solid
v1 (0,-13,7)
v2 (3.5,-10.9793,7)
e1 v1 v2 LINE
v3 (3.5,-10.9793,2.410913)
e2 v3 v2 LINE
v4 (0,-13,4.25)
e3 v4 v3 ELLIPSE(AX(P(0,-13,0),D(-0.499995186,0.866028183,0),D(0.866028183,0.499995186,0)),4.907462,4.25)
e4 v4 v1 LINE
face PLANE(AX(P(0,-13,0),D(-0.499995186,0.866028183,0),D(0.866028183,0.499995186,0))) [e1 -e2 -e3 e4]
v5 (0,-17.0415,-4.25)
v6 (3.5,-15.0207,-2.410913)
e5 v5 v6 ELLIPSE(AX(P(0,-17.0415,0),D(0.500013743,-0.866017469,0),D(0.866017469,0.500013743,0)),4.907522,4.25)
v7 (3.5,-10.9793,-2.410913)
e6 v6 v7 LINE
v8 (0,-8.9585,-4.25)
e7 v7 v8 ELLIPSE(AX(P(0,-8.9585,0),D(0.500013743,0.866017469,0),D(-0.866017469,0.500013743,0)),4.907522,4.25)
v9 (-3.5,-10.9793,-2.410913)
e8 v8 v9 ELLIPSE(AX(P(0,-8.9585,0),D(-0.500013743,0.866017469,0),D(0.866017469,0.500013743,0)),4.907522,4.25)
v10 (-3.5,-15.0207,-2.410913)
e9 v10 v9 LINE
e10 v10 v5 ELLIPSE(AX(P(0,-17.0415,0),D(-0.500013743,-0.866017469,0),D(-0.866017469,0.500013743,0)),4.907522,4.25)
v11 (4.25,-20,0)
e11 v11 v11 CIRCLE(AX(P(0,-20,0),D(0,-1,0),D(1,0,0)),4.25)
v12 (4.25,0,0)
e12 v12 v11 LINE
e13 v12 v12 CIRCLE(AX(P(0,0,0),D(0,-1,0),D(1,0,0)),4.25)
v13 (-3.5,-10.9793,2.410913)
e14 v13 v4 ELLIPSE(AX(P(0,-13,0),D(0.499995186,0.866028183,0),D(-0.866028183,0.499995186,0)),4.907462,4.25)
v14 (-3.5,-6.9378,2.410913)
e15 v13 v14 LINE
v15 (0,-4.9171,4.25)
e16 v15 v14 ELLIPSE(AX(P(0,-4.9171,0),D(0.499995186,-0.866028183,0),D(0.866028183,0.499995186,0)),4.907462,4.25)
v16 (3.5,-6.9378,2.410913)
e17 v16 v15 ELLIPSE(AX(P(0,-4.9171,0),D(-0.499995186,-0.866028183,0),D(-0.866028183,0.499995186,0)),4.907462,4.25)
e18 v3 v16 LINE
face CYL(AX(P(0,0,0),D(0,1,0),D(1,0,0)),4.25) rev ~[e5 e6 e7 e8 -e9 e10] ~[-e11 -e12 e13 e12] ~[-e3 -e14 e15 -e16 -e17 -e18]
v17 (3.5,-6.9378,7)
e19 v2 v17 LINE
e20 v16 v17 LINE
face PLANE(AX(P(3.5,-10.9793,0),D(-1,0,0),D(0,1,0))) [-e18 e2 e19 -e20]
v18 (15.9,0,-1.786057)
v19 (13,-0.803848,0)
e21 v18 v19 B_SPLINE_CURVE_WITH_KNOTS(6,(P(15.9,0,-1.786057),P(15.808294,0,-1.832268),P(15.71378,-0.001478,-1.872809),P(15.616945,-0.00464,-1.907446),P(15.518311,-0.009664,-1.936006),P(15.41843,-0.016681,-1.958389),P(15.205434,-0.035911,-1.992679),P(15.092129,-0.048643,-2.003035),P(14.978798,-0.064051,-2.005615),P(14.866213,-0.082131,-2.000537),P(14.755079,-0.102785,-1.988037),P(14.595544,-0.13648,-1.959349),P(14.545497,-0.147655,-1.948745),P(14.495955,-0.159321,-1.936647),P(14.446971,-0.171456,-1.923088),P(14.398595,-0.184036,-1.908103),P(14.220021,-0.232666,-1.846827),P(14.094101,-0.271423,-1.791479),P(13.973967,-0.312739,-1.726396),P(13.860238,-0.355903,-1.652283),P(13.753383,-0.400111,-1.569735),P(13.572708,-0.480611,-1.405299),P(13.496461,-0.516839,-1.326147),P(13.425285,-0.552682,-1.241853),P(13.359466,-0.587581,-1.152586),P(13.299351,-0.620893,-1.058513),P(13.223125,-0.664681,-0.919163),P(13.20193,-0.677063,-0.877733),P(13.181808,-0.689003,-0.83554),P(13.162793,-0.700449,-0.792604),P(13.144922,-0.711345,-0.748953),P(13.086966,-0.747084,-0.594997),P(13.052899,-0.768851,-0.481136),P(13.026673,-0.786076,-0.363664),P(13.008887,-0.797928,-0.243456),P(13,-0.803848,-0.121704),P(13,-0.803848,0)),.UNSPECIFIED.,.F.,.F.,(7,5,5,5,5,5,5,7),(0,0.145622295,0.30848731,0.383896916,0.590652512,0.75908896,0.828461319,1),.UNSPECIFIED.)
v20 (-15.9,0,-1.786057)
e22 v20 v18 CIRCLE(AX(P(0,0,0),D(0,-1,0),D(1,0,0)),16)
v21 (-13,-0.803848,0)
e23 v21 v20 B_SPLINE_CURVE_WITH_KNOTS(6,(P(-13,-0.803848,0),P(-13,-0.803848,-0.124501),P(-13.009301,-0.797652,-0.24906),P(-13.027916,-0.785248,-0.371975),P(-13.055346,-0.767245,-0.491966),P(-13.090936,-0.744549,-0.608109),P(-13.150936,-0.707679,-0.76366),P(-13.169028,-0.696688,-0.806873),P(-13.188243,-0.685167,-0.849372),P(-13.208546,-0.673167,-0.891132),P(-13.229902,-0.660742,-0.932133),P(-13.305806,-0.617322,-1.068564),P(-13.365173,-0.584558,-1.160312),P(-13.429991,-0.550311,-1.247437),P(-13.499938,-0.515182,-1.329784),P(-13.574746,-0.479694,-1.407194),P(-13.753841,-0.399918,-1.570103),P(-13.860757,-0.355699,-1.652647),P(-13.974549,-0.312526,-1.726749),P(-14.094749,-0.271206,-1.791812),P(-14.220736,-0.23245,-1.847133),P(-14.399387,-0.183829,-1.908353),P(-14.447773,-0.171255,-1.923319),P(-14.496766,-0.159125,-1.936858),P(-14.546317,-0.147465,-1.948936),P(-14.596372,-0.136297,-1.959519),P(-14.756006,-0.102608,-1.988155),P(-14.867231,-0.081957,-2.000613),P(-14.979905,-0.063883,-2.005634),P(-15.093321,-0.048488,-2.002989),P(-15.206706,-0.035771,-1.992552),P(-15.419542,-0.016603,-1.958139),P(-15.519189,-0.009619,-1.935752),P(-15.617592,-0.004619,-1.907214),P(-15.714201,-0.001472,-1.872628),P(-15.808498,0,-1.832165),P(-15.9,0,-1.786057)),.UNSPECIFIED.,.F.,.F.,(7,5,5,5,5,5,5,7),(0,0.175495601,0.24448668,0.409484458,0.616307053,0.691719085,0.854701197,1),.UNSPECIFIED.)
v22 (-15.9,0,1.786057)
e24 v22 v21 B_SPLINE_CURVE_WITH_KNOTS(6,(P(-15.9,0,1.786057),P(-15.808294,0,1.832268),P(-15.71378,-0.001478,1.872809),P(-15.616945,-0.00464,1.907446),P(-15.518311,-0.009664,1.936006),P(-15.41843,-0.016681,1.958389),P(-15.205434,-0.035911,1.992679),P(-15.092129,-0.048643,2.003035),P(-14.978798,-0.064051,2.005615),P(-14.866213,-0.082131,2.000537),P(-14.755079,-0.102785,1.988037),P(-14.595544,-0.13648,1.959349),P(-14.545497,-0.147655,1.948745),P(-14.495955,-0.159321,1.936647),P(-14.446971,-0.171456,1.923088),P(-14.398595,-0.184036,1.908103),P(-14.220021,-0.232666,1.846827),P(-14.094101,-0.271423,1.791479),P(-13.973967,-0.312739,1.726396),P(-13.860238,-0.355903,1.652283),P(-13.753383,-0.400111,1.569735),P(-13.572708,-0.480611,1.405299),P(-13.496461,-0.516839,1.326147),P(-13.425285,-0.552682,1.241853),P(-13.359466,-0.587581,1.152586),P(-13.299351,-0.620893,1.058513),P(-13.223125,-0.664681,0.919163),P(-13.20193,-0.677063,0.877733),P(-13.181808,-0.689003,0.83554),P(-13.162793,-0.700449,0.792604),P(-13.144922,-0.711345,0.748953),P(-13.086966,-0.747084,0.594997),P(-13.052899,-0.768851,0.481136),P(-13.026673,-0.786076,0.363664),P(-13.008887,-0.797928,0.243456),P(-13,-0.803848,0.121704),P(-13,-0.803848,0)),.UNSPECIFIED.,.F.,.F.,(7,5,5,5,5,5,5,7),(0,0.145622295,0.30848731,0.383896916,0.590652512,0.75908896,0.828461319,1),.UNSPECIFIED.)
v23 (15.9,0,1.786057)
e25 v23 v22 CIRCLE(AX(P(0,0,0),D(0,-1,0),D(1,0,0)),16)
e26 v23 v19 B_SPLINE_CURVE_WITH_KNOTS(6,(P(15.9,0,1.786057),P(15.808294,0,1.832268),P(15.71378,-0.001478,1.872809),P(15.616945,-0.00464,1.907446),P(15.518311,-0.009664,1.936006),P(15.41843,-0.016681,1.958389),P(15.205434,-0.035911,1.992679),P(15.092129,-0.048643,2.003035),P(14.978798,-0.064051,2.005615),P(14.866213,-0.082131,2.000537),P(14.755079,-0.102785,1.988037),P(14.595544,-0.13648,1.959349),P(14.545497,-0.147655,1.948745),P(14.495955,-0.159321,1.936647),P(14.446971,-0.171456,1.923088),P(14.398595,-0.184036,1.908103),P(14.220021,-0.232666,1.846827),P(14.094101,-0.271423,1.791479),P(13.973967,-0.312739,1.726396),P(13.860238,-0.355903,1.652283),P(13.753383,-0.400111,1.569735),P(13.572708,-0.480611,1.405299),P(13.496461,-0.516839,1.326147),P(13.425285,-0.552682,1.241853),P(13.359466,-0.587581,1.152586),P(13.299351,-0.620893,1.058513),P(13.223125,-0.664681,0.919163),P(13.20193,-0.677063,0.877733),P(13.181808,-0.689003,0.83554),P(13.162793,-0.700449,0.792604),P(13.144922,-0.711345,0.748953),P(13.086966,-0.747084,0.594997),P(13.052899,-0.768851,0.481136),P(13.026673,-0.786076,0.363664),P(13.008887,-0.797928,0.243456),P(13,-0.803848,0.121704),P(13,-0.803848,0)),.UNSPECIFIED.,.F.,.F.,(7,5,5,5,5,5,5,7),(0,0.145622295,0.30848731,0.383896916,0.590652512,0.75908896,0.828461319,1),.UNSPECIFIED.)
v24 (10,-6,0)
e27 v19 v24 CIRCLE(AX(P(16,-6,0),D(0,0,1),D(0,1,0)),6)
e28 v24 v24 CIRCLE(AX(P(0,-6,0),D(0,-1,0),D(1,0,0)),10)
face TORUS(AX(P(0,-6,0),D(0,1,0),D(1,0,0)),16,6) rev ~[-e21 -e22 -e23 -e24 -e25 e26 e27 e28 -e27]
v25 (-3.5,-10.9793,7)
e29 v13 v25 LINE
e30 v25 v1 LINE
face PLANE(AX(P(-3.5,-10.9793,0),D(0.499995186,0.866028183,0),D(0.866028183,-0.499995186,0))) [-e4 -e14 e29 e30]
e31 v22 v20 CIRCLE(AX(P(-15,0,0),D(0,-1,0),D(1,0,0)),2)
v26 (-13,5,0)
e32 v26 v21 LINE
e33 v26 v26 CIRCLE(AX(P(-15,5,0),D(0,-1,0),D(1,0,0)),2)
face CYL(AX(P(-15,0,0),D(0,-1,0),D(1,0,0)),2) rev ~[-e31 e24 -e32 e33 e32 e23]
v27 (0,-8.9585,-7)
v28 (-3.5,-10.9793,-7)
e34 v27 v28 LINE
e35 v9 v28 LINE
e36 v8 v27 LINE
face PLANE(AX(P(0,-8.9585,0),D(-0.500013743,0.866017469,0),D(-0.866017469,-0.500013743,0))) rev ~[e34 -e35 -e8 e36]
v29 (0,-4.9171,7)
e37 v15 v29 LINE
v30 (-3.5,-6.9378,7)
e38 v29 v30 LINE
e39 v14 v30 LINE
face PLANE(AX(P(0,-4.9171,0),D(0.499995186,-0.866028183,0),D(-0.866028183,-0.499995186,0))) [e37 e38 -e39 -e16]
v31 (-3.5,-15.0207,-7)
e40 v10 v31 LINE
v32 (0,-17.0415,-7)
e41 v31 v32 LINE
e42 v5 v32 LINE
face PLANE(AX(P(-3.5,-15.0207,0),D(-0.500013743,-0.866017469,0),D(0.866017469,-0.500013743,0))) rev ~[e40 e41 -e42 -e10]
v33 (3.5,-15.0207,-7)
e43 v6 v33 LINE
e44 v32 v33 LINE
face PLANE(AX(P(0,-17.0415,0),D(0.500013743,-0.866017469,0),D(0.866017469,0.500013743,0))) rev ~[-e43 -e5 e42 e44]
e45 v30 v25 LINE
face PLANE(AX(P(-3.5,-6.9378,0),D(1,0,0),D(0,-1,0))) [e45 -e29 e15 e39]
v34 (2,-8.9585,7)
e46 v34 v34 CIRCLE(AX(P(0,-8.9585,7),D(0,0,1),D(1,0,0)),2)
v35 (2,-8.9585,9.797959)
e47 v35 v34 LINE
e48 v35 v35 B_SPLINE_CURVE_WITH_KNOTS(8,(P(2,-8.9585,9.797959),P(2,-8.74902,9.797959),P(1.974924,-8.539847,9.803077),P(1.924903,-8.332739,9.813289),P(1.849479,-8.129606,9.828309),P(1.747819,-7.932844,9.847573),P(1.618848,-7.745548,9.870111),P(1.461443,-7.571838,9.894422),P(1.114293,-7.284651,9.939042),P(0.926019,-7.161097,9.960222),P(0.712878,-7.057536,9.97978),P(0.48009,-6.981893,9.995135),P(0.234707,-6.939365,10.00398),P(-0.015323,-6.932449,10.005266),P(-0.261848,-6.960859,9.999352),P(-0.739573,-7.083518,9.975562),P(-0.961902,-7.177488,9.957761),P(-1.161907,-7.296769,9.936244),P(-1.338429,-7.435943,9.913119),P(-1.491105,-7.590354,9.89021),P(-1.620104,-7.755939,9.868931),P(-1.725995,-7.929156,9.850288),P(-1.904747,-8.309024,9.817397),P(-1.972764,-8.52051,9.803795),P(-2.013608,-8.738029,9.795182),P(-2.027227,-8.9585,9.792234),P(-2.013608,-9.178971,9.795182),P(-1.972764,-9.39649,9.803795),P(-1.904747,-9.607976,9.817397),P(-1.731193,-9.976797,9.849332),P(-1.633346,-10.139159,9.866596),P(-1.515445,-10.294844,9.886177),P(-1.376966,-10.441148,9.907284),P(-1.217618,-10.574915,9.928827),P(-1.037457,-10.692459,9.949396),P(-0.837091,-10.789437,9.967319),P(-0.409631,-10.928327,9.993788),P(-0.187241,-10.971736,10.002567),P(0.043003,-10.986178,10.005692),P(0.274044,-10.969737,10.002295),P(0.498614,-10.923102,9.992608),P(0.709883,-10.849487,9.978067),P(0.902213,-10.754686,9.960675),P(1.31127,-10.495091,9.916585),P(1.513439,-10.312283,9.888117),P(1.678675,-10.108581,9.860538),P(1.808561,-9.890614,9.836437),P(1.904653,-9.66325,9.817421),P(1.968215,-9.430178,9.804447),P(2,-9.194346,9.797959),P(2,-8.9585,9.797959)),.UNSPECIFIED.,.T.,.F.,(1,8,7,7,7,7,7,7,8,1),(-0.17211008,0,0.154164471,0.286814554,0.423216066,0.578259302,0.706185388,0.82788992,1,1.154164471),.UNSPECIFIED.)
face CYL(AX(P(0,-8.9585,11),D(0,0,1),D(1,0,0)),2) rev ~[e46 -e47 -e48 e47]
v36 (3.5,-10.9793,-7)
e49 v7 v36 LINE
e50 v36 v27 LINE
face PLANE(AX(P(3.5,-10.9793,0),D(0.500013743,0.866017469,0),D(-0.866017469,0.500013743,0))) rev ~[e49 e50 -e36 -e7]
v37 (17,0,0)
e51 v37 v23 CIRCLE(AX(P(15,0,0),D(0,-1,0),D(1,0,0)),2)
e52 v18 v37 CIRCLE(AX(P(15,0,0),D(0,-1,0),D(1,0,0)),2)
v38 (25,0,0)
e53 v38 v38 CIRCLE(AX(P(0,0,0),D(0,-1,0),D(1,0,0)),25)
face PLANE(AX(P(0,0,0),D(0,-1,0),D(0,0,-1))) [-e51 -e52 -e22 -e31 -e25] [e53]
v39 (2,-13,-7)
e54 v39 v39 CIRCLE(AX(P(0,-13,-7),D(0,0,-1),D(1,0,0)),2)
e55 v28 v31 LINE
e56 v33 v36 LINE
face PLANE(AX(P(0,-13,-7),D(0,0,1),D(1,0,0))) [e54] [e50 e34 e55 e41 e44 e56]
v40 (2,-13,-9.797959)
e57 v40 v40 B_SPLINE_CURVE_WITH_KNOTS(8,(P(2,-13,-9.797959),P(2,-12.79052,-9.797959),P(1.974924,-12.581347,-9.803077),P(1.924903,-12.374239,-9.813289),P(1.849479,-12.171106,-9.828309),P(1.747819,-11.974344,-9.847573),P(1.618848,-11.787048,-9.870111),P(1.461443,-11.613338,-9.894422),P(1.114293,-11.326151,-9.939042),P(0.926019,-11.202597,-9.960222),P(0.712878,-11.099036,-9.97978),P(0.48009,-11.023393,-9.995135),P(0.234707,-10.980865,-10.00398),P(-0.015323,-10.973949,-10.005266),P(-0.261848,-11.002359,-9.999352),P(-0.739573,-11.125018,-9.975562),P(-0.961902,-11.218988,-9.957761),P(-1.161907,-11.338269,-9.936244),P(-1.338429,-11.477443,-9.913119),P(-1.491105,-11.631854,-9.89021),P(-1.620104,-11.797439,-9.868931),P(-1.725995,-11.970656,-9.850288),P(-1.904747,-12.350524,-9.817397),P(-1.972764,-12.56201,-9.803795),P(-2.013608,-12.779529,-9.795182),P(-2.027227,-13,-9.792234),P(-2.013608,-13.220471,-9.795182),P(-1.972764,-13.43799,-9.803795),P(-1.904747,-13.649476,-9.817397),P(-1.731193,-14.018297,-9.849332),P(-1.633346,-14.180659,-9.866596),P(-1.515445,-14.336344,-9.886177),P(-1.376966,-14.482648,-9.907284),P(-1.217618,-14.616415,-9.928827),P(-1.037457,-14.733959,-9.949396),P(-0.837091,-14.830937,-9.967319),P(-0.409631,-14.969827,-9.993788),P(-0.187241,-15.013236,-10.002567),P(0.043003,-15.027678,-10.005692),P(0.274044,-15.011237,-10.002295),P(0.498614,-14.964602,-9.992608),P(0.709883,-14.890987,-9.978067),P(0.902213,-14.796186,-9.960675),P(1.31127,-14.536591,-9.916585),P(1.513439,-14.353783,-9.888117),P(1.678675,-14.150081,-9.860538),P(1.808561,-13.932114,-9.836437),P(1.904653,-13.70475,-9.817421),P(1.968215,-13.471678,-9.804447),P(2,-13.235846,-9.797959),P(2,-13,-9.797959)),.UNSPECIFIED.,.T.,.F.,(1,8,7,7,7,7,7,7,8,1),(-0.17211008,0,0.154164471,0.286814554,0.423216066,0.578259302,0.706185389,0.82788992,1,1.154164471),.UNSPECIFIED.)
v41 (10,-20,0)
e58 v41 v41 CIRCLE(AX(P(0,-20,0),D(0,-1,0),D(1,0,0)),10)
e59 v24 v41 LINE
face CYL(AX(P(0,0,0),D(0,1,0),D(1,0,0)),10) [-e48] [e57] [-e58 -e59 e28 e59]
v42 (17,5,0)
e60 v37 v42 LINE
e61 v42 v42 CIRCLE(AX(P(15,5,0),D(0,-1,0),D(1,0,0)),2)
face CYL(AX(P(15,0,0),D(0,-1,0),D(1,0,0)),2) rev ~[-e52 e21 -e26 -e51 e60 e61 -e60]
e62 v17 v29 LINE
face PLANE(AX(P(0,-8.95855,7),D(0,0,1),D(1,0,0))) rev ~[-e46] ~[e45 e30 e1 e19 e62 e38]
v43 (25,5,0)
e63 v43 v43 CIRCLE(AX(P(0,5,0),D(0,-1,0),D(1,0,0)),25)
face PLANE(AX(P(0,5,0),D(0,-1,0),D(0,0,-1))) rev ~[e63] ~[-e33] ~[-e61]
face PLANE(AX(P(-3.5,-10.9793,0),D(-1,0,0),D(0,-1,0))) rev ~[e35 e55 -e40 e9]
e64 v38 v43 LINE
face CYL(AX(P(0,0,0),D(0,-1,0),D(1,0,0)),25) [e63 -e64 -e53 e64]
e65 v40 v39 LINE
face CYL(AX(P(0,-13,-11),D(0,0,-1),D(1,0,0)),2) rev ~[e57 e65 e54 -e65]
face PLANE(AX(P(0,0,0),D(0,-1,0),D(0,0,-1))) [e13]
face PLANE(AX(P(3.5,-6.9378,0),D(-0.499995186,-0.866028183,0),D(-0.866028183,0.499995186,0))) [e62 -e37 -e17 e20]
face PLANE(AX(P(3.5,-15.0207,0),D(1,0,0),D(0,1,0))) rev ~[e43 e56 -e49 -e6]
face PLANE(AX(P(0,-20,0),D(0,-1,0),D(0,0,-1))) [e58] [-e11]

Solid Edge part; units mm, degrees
sketch "Sketch1" plane through (0, 0, 0) normal (0, -1, 0) x (1, 0, 0)
  circle A0 centre (0, 0) radius 10
  circle A1 centre (0, 0) radius 4.25
extrude "Protrusion1" add sketch "Sketch1" along normal blind 20
sketch "Sketch2" plane through (0, 0, 0) normal (0, -1, 0) x (1, 0, 0)
  circle A0 centre (-15, 0) radius 2
  circle A1 centre (0, 0) radius 25
  circle A2 centre (15, 0) radius 2
extrude "ExtrudedProtrusion_3" add sketch "Sketch2" against normal blind 5
fillet "Round_2" radius 6 1 edges at (-10, 0, 0)
sketch "Sketch3" plane through (0, 0, 0) normal (0, 0, 1) x (1, 0, 0)
  line L0 (-3.5, -10.9793) -> (-3.5, -15.0207)
  line L1 (-3.5, -15.0207) -> (0, -17.0415)
  line L2 (0, -17.0415) -> (3.5, -15.0207)
  line L3 (3.5, -15.0207) -> (3.5, -10.9793)
  line L4 (3.5, -10.9793) -> (0, -8.9585)
  line L5 (0, -8.9585) -> (-3.5, -10.9793)
extrude "ExtrudedCutout_3" cut sketch "Sketch3" against normal blind 7
sketch "Sketch4" plane through (0, 0, 0) normal (0, 0, 1) x (1, 0, 0)
  line L0 (0, -13) -> (3.5, -10.9793)
  line L1 (3.5, -10.9793) -> (3.5, -6.9378)
  line L2 (3.5, -6.9378) -> (0, -4.9171)
  line L3 (0, -4.9171) -> (-3.5, -6.9378)
  line L4 (-3.5, -6.9378) -> (-3.5, -10.9793)
  line L5 (-3.5, -10.9793) -> (0, -13)
extrude "ExtrudedCutout_4" cut sketch "Sketch4" along normal blind 7
sketch "Sketch5" plane through (0, 0, -11) normal (0, 0, 1) x (1, 0, 0)
  circle A0 centre (0, -13) radius 2
extrude "ExtrudedCutout_5" cut sketch "Sketch5" along normal blind 8
sketch "Sketch6" plane through (0, 0, 11) normal (0, 0, 1) x (1, 0, 0)
  circle A0 centre (0, -8.9585) radius 2
extrude "ExtrudedCutout_6" cut sketch "Sketch6" against normal blind 8
